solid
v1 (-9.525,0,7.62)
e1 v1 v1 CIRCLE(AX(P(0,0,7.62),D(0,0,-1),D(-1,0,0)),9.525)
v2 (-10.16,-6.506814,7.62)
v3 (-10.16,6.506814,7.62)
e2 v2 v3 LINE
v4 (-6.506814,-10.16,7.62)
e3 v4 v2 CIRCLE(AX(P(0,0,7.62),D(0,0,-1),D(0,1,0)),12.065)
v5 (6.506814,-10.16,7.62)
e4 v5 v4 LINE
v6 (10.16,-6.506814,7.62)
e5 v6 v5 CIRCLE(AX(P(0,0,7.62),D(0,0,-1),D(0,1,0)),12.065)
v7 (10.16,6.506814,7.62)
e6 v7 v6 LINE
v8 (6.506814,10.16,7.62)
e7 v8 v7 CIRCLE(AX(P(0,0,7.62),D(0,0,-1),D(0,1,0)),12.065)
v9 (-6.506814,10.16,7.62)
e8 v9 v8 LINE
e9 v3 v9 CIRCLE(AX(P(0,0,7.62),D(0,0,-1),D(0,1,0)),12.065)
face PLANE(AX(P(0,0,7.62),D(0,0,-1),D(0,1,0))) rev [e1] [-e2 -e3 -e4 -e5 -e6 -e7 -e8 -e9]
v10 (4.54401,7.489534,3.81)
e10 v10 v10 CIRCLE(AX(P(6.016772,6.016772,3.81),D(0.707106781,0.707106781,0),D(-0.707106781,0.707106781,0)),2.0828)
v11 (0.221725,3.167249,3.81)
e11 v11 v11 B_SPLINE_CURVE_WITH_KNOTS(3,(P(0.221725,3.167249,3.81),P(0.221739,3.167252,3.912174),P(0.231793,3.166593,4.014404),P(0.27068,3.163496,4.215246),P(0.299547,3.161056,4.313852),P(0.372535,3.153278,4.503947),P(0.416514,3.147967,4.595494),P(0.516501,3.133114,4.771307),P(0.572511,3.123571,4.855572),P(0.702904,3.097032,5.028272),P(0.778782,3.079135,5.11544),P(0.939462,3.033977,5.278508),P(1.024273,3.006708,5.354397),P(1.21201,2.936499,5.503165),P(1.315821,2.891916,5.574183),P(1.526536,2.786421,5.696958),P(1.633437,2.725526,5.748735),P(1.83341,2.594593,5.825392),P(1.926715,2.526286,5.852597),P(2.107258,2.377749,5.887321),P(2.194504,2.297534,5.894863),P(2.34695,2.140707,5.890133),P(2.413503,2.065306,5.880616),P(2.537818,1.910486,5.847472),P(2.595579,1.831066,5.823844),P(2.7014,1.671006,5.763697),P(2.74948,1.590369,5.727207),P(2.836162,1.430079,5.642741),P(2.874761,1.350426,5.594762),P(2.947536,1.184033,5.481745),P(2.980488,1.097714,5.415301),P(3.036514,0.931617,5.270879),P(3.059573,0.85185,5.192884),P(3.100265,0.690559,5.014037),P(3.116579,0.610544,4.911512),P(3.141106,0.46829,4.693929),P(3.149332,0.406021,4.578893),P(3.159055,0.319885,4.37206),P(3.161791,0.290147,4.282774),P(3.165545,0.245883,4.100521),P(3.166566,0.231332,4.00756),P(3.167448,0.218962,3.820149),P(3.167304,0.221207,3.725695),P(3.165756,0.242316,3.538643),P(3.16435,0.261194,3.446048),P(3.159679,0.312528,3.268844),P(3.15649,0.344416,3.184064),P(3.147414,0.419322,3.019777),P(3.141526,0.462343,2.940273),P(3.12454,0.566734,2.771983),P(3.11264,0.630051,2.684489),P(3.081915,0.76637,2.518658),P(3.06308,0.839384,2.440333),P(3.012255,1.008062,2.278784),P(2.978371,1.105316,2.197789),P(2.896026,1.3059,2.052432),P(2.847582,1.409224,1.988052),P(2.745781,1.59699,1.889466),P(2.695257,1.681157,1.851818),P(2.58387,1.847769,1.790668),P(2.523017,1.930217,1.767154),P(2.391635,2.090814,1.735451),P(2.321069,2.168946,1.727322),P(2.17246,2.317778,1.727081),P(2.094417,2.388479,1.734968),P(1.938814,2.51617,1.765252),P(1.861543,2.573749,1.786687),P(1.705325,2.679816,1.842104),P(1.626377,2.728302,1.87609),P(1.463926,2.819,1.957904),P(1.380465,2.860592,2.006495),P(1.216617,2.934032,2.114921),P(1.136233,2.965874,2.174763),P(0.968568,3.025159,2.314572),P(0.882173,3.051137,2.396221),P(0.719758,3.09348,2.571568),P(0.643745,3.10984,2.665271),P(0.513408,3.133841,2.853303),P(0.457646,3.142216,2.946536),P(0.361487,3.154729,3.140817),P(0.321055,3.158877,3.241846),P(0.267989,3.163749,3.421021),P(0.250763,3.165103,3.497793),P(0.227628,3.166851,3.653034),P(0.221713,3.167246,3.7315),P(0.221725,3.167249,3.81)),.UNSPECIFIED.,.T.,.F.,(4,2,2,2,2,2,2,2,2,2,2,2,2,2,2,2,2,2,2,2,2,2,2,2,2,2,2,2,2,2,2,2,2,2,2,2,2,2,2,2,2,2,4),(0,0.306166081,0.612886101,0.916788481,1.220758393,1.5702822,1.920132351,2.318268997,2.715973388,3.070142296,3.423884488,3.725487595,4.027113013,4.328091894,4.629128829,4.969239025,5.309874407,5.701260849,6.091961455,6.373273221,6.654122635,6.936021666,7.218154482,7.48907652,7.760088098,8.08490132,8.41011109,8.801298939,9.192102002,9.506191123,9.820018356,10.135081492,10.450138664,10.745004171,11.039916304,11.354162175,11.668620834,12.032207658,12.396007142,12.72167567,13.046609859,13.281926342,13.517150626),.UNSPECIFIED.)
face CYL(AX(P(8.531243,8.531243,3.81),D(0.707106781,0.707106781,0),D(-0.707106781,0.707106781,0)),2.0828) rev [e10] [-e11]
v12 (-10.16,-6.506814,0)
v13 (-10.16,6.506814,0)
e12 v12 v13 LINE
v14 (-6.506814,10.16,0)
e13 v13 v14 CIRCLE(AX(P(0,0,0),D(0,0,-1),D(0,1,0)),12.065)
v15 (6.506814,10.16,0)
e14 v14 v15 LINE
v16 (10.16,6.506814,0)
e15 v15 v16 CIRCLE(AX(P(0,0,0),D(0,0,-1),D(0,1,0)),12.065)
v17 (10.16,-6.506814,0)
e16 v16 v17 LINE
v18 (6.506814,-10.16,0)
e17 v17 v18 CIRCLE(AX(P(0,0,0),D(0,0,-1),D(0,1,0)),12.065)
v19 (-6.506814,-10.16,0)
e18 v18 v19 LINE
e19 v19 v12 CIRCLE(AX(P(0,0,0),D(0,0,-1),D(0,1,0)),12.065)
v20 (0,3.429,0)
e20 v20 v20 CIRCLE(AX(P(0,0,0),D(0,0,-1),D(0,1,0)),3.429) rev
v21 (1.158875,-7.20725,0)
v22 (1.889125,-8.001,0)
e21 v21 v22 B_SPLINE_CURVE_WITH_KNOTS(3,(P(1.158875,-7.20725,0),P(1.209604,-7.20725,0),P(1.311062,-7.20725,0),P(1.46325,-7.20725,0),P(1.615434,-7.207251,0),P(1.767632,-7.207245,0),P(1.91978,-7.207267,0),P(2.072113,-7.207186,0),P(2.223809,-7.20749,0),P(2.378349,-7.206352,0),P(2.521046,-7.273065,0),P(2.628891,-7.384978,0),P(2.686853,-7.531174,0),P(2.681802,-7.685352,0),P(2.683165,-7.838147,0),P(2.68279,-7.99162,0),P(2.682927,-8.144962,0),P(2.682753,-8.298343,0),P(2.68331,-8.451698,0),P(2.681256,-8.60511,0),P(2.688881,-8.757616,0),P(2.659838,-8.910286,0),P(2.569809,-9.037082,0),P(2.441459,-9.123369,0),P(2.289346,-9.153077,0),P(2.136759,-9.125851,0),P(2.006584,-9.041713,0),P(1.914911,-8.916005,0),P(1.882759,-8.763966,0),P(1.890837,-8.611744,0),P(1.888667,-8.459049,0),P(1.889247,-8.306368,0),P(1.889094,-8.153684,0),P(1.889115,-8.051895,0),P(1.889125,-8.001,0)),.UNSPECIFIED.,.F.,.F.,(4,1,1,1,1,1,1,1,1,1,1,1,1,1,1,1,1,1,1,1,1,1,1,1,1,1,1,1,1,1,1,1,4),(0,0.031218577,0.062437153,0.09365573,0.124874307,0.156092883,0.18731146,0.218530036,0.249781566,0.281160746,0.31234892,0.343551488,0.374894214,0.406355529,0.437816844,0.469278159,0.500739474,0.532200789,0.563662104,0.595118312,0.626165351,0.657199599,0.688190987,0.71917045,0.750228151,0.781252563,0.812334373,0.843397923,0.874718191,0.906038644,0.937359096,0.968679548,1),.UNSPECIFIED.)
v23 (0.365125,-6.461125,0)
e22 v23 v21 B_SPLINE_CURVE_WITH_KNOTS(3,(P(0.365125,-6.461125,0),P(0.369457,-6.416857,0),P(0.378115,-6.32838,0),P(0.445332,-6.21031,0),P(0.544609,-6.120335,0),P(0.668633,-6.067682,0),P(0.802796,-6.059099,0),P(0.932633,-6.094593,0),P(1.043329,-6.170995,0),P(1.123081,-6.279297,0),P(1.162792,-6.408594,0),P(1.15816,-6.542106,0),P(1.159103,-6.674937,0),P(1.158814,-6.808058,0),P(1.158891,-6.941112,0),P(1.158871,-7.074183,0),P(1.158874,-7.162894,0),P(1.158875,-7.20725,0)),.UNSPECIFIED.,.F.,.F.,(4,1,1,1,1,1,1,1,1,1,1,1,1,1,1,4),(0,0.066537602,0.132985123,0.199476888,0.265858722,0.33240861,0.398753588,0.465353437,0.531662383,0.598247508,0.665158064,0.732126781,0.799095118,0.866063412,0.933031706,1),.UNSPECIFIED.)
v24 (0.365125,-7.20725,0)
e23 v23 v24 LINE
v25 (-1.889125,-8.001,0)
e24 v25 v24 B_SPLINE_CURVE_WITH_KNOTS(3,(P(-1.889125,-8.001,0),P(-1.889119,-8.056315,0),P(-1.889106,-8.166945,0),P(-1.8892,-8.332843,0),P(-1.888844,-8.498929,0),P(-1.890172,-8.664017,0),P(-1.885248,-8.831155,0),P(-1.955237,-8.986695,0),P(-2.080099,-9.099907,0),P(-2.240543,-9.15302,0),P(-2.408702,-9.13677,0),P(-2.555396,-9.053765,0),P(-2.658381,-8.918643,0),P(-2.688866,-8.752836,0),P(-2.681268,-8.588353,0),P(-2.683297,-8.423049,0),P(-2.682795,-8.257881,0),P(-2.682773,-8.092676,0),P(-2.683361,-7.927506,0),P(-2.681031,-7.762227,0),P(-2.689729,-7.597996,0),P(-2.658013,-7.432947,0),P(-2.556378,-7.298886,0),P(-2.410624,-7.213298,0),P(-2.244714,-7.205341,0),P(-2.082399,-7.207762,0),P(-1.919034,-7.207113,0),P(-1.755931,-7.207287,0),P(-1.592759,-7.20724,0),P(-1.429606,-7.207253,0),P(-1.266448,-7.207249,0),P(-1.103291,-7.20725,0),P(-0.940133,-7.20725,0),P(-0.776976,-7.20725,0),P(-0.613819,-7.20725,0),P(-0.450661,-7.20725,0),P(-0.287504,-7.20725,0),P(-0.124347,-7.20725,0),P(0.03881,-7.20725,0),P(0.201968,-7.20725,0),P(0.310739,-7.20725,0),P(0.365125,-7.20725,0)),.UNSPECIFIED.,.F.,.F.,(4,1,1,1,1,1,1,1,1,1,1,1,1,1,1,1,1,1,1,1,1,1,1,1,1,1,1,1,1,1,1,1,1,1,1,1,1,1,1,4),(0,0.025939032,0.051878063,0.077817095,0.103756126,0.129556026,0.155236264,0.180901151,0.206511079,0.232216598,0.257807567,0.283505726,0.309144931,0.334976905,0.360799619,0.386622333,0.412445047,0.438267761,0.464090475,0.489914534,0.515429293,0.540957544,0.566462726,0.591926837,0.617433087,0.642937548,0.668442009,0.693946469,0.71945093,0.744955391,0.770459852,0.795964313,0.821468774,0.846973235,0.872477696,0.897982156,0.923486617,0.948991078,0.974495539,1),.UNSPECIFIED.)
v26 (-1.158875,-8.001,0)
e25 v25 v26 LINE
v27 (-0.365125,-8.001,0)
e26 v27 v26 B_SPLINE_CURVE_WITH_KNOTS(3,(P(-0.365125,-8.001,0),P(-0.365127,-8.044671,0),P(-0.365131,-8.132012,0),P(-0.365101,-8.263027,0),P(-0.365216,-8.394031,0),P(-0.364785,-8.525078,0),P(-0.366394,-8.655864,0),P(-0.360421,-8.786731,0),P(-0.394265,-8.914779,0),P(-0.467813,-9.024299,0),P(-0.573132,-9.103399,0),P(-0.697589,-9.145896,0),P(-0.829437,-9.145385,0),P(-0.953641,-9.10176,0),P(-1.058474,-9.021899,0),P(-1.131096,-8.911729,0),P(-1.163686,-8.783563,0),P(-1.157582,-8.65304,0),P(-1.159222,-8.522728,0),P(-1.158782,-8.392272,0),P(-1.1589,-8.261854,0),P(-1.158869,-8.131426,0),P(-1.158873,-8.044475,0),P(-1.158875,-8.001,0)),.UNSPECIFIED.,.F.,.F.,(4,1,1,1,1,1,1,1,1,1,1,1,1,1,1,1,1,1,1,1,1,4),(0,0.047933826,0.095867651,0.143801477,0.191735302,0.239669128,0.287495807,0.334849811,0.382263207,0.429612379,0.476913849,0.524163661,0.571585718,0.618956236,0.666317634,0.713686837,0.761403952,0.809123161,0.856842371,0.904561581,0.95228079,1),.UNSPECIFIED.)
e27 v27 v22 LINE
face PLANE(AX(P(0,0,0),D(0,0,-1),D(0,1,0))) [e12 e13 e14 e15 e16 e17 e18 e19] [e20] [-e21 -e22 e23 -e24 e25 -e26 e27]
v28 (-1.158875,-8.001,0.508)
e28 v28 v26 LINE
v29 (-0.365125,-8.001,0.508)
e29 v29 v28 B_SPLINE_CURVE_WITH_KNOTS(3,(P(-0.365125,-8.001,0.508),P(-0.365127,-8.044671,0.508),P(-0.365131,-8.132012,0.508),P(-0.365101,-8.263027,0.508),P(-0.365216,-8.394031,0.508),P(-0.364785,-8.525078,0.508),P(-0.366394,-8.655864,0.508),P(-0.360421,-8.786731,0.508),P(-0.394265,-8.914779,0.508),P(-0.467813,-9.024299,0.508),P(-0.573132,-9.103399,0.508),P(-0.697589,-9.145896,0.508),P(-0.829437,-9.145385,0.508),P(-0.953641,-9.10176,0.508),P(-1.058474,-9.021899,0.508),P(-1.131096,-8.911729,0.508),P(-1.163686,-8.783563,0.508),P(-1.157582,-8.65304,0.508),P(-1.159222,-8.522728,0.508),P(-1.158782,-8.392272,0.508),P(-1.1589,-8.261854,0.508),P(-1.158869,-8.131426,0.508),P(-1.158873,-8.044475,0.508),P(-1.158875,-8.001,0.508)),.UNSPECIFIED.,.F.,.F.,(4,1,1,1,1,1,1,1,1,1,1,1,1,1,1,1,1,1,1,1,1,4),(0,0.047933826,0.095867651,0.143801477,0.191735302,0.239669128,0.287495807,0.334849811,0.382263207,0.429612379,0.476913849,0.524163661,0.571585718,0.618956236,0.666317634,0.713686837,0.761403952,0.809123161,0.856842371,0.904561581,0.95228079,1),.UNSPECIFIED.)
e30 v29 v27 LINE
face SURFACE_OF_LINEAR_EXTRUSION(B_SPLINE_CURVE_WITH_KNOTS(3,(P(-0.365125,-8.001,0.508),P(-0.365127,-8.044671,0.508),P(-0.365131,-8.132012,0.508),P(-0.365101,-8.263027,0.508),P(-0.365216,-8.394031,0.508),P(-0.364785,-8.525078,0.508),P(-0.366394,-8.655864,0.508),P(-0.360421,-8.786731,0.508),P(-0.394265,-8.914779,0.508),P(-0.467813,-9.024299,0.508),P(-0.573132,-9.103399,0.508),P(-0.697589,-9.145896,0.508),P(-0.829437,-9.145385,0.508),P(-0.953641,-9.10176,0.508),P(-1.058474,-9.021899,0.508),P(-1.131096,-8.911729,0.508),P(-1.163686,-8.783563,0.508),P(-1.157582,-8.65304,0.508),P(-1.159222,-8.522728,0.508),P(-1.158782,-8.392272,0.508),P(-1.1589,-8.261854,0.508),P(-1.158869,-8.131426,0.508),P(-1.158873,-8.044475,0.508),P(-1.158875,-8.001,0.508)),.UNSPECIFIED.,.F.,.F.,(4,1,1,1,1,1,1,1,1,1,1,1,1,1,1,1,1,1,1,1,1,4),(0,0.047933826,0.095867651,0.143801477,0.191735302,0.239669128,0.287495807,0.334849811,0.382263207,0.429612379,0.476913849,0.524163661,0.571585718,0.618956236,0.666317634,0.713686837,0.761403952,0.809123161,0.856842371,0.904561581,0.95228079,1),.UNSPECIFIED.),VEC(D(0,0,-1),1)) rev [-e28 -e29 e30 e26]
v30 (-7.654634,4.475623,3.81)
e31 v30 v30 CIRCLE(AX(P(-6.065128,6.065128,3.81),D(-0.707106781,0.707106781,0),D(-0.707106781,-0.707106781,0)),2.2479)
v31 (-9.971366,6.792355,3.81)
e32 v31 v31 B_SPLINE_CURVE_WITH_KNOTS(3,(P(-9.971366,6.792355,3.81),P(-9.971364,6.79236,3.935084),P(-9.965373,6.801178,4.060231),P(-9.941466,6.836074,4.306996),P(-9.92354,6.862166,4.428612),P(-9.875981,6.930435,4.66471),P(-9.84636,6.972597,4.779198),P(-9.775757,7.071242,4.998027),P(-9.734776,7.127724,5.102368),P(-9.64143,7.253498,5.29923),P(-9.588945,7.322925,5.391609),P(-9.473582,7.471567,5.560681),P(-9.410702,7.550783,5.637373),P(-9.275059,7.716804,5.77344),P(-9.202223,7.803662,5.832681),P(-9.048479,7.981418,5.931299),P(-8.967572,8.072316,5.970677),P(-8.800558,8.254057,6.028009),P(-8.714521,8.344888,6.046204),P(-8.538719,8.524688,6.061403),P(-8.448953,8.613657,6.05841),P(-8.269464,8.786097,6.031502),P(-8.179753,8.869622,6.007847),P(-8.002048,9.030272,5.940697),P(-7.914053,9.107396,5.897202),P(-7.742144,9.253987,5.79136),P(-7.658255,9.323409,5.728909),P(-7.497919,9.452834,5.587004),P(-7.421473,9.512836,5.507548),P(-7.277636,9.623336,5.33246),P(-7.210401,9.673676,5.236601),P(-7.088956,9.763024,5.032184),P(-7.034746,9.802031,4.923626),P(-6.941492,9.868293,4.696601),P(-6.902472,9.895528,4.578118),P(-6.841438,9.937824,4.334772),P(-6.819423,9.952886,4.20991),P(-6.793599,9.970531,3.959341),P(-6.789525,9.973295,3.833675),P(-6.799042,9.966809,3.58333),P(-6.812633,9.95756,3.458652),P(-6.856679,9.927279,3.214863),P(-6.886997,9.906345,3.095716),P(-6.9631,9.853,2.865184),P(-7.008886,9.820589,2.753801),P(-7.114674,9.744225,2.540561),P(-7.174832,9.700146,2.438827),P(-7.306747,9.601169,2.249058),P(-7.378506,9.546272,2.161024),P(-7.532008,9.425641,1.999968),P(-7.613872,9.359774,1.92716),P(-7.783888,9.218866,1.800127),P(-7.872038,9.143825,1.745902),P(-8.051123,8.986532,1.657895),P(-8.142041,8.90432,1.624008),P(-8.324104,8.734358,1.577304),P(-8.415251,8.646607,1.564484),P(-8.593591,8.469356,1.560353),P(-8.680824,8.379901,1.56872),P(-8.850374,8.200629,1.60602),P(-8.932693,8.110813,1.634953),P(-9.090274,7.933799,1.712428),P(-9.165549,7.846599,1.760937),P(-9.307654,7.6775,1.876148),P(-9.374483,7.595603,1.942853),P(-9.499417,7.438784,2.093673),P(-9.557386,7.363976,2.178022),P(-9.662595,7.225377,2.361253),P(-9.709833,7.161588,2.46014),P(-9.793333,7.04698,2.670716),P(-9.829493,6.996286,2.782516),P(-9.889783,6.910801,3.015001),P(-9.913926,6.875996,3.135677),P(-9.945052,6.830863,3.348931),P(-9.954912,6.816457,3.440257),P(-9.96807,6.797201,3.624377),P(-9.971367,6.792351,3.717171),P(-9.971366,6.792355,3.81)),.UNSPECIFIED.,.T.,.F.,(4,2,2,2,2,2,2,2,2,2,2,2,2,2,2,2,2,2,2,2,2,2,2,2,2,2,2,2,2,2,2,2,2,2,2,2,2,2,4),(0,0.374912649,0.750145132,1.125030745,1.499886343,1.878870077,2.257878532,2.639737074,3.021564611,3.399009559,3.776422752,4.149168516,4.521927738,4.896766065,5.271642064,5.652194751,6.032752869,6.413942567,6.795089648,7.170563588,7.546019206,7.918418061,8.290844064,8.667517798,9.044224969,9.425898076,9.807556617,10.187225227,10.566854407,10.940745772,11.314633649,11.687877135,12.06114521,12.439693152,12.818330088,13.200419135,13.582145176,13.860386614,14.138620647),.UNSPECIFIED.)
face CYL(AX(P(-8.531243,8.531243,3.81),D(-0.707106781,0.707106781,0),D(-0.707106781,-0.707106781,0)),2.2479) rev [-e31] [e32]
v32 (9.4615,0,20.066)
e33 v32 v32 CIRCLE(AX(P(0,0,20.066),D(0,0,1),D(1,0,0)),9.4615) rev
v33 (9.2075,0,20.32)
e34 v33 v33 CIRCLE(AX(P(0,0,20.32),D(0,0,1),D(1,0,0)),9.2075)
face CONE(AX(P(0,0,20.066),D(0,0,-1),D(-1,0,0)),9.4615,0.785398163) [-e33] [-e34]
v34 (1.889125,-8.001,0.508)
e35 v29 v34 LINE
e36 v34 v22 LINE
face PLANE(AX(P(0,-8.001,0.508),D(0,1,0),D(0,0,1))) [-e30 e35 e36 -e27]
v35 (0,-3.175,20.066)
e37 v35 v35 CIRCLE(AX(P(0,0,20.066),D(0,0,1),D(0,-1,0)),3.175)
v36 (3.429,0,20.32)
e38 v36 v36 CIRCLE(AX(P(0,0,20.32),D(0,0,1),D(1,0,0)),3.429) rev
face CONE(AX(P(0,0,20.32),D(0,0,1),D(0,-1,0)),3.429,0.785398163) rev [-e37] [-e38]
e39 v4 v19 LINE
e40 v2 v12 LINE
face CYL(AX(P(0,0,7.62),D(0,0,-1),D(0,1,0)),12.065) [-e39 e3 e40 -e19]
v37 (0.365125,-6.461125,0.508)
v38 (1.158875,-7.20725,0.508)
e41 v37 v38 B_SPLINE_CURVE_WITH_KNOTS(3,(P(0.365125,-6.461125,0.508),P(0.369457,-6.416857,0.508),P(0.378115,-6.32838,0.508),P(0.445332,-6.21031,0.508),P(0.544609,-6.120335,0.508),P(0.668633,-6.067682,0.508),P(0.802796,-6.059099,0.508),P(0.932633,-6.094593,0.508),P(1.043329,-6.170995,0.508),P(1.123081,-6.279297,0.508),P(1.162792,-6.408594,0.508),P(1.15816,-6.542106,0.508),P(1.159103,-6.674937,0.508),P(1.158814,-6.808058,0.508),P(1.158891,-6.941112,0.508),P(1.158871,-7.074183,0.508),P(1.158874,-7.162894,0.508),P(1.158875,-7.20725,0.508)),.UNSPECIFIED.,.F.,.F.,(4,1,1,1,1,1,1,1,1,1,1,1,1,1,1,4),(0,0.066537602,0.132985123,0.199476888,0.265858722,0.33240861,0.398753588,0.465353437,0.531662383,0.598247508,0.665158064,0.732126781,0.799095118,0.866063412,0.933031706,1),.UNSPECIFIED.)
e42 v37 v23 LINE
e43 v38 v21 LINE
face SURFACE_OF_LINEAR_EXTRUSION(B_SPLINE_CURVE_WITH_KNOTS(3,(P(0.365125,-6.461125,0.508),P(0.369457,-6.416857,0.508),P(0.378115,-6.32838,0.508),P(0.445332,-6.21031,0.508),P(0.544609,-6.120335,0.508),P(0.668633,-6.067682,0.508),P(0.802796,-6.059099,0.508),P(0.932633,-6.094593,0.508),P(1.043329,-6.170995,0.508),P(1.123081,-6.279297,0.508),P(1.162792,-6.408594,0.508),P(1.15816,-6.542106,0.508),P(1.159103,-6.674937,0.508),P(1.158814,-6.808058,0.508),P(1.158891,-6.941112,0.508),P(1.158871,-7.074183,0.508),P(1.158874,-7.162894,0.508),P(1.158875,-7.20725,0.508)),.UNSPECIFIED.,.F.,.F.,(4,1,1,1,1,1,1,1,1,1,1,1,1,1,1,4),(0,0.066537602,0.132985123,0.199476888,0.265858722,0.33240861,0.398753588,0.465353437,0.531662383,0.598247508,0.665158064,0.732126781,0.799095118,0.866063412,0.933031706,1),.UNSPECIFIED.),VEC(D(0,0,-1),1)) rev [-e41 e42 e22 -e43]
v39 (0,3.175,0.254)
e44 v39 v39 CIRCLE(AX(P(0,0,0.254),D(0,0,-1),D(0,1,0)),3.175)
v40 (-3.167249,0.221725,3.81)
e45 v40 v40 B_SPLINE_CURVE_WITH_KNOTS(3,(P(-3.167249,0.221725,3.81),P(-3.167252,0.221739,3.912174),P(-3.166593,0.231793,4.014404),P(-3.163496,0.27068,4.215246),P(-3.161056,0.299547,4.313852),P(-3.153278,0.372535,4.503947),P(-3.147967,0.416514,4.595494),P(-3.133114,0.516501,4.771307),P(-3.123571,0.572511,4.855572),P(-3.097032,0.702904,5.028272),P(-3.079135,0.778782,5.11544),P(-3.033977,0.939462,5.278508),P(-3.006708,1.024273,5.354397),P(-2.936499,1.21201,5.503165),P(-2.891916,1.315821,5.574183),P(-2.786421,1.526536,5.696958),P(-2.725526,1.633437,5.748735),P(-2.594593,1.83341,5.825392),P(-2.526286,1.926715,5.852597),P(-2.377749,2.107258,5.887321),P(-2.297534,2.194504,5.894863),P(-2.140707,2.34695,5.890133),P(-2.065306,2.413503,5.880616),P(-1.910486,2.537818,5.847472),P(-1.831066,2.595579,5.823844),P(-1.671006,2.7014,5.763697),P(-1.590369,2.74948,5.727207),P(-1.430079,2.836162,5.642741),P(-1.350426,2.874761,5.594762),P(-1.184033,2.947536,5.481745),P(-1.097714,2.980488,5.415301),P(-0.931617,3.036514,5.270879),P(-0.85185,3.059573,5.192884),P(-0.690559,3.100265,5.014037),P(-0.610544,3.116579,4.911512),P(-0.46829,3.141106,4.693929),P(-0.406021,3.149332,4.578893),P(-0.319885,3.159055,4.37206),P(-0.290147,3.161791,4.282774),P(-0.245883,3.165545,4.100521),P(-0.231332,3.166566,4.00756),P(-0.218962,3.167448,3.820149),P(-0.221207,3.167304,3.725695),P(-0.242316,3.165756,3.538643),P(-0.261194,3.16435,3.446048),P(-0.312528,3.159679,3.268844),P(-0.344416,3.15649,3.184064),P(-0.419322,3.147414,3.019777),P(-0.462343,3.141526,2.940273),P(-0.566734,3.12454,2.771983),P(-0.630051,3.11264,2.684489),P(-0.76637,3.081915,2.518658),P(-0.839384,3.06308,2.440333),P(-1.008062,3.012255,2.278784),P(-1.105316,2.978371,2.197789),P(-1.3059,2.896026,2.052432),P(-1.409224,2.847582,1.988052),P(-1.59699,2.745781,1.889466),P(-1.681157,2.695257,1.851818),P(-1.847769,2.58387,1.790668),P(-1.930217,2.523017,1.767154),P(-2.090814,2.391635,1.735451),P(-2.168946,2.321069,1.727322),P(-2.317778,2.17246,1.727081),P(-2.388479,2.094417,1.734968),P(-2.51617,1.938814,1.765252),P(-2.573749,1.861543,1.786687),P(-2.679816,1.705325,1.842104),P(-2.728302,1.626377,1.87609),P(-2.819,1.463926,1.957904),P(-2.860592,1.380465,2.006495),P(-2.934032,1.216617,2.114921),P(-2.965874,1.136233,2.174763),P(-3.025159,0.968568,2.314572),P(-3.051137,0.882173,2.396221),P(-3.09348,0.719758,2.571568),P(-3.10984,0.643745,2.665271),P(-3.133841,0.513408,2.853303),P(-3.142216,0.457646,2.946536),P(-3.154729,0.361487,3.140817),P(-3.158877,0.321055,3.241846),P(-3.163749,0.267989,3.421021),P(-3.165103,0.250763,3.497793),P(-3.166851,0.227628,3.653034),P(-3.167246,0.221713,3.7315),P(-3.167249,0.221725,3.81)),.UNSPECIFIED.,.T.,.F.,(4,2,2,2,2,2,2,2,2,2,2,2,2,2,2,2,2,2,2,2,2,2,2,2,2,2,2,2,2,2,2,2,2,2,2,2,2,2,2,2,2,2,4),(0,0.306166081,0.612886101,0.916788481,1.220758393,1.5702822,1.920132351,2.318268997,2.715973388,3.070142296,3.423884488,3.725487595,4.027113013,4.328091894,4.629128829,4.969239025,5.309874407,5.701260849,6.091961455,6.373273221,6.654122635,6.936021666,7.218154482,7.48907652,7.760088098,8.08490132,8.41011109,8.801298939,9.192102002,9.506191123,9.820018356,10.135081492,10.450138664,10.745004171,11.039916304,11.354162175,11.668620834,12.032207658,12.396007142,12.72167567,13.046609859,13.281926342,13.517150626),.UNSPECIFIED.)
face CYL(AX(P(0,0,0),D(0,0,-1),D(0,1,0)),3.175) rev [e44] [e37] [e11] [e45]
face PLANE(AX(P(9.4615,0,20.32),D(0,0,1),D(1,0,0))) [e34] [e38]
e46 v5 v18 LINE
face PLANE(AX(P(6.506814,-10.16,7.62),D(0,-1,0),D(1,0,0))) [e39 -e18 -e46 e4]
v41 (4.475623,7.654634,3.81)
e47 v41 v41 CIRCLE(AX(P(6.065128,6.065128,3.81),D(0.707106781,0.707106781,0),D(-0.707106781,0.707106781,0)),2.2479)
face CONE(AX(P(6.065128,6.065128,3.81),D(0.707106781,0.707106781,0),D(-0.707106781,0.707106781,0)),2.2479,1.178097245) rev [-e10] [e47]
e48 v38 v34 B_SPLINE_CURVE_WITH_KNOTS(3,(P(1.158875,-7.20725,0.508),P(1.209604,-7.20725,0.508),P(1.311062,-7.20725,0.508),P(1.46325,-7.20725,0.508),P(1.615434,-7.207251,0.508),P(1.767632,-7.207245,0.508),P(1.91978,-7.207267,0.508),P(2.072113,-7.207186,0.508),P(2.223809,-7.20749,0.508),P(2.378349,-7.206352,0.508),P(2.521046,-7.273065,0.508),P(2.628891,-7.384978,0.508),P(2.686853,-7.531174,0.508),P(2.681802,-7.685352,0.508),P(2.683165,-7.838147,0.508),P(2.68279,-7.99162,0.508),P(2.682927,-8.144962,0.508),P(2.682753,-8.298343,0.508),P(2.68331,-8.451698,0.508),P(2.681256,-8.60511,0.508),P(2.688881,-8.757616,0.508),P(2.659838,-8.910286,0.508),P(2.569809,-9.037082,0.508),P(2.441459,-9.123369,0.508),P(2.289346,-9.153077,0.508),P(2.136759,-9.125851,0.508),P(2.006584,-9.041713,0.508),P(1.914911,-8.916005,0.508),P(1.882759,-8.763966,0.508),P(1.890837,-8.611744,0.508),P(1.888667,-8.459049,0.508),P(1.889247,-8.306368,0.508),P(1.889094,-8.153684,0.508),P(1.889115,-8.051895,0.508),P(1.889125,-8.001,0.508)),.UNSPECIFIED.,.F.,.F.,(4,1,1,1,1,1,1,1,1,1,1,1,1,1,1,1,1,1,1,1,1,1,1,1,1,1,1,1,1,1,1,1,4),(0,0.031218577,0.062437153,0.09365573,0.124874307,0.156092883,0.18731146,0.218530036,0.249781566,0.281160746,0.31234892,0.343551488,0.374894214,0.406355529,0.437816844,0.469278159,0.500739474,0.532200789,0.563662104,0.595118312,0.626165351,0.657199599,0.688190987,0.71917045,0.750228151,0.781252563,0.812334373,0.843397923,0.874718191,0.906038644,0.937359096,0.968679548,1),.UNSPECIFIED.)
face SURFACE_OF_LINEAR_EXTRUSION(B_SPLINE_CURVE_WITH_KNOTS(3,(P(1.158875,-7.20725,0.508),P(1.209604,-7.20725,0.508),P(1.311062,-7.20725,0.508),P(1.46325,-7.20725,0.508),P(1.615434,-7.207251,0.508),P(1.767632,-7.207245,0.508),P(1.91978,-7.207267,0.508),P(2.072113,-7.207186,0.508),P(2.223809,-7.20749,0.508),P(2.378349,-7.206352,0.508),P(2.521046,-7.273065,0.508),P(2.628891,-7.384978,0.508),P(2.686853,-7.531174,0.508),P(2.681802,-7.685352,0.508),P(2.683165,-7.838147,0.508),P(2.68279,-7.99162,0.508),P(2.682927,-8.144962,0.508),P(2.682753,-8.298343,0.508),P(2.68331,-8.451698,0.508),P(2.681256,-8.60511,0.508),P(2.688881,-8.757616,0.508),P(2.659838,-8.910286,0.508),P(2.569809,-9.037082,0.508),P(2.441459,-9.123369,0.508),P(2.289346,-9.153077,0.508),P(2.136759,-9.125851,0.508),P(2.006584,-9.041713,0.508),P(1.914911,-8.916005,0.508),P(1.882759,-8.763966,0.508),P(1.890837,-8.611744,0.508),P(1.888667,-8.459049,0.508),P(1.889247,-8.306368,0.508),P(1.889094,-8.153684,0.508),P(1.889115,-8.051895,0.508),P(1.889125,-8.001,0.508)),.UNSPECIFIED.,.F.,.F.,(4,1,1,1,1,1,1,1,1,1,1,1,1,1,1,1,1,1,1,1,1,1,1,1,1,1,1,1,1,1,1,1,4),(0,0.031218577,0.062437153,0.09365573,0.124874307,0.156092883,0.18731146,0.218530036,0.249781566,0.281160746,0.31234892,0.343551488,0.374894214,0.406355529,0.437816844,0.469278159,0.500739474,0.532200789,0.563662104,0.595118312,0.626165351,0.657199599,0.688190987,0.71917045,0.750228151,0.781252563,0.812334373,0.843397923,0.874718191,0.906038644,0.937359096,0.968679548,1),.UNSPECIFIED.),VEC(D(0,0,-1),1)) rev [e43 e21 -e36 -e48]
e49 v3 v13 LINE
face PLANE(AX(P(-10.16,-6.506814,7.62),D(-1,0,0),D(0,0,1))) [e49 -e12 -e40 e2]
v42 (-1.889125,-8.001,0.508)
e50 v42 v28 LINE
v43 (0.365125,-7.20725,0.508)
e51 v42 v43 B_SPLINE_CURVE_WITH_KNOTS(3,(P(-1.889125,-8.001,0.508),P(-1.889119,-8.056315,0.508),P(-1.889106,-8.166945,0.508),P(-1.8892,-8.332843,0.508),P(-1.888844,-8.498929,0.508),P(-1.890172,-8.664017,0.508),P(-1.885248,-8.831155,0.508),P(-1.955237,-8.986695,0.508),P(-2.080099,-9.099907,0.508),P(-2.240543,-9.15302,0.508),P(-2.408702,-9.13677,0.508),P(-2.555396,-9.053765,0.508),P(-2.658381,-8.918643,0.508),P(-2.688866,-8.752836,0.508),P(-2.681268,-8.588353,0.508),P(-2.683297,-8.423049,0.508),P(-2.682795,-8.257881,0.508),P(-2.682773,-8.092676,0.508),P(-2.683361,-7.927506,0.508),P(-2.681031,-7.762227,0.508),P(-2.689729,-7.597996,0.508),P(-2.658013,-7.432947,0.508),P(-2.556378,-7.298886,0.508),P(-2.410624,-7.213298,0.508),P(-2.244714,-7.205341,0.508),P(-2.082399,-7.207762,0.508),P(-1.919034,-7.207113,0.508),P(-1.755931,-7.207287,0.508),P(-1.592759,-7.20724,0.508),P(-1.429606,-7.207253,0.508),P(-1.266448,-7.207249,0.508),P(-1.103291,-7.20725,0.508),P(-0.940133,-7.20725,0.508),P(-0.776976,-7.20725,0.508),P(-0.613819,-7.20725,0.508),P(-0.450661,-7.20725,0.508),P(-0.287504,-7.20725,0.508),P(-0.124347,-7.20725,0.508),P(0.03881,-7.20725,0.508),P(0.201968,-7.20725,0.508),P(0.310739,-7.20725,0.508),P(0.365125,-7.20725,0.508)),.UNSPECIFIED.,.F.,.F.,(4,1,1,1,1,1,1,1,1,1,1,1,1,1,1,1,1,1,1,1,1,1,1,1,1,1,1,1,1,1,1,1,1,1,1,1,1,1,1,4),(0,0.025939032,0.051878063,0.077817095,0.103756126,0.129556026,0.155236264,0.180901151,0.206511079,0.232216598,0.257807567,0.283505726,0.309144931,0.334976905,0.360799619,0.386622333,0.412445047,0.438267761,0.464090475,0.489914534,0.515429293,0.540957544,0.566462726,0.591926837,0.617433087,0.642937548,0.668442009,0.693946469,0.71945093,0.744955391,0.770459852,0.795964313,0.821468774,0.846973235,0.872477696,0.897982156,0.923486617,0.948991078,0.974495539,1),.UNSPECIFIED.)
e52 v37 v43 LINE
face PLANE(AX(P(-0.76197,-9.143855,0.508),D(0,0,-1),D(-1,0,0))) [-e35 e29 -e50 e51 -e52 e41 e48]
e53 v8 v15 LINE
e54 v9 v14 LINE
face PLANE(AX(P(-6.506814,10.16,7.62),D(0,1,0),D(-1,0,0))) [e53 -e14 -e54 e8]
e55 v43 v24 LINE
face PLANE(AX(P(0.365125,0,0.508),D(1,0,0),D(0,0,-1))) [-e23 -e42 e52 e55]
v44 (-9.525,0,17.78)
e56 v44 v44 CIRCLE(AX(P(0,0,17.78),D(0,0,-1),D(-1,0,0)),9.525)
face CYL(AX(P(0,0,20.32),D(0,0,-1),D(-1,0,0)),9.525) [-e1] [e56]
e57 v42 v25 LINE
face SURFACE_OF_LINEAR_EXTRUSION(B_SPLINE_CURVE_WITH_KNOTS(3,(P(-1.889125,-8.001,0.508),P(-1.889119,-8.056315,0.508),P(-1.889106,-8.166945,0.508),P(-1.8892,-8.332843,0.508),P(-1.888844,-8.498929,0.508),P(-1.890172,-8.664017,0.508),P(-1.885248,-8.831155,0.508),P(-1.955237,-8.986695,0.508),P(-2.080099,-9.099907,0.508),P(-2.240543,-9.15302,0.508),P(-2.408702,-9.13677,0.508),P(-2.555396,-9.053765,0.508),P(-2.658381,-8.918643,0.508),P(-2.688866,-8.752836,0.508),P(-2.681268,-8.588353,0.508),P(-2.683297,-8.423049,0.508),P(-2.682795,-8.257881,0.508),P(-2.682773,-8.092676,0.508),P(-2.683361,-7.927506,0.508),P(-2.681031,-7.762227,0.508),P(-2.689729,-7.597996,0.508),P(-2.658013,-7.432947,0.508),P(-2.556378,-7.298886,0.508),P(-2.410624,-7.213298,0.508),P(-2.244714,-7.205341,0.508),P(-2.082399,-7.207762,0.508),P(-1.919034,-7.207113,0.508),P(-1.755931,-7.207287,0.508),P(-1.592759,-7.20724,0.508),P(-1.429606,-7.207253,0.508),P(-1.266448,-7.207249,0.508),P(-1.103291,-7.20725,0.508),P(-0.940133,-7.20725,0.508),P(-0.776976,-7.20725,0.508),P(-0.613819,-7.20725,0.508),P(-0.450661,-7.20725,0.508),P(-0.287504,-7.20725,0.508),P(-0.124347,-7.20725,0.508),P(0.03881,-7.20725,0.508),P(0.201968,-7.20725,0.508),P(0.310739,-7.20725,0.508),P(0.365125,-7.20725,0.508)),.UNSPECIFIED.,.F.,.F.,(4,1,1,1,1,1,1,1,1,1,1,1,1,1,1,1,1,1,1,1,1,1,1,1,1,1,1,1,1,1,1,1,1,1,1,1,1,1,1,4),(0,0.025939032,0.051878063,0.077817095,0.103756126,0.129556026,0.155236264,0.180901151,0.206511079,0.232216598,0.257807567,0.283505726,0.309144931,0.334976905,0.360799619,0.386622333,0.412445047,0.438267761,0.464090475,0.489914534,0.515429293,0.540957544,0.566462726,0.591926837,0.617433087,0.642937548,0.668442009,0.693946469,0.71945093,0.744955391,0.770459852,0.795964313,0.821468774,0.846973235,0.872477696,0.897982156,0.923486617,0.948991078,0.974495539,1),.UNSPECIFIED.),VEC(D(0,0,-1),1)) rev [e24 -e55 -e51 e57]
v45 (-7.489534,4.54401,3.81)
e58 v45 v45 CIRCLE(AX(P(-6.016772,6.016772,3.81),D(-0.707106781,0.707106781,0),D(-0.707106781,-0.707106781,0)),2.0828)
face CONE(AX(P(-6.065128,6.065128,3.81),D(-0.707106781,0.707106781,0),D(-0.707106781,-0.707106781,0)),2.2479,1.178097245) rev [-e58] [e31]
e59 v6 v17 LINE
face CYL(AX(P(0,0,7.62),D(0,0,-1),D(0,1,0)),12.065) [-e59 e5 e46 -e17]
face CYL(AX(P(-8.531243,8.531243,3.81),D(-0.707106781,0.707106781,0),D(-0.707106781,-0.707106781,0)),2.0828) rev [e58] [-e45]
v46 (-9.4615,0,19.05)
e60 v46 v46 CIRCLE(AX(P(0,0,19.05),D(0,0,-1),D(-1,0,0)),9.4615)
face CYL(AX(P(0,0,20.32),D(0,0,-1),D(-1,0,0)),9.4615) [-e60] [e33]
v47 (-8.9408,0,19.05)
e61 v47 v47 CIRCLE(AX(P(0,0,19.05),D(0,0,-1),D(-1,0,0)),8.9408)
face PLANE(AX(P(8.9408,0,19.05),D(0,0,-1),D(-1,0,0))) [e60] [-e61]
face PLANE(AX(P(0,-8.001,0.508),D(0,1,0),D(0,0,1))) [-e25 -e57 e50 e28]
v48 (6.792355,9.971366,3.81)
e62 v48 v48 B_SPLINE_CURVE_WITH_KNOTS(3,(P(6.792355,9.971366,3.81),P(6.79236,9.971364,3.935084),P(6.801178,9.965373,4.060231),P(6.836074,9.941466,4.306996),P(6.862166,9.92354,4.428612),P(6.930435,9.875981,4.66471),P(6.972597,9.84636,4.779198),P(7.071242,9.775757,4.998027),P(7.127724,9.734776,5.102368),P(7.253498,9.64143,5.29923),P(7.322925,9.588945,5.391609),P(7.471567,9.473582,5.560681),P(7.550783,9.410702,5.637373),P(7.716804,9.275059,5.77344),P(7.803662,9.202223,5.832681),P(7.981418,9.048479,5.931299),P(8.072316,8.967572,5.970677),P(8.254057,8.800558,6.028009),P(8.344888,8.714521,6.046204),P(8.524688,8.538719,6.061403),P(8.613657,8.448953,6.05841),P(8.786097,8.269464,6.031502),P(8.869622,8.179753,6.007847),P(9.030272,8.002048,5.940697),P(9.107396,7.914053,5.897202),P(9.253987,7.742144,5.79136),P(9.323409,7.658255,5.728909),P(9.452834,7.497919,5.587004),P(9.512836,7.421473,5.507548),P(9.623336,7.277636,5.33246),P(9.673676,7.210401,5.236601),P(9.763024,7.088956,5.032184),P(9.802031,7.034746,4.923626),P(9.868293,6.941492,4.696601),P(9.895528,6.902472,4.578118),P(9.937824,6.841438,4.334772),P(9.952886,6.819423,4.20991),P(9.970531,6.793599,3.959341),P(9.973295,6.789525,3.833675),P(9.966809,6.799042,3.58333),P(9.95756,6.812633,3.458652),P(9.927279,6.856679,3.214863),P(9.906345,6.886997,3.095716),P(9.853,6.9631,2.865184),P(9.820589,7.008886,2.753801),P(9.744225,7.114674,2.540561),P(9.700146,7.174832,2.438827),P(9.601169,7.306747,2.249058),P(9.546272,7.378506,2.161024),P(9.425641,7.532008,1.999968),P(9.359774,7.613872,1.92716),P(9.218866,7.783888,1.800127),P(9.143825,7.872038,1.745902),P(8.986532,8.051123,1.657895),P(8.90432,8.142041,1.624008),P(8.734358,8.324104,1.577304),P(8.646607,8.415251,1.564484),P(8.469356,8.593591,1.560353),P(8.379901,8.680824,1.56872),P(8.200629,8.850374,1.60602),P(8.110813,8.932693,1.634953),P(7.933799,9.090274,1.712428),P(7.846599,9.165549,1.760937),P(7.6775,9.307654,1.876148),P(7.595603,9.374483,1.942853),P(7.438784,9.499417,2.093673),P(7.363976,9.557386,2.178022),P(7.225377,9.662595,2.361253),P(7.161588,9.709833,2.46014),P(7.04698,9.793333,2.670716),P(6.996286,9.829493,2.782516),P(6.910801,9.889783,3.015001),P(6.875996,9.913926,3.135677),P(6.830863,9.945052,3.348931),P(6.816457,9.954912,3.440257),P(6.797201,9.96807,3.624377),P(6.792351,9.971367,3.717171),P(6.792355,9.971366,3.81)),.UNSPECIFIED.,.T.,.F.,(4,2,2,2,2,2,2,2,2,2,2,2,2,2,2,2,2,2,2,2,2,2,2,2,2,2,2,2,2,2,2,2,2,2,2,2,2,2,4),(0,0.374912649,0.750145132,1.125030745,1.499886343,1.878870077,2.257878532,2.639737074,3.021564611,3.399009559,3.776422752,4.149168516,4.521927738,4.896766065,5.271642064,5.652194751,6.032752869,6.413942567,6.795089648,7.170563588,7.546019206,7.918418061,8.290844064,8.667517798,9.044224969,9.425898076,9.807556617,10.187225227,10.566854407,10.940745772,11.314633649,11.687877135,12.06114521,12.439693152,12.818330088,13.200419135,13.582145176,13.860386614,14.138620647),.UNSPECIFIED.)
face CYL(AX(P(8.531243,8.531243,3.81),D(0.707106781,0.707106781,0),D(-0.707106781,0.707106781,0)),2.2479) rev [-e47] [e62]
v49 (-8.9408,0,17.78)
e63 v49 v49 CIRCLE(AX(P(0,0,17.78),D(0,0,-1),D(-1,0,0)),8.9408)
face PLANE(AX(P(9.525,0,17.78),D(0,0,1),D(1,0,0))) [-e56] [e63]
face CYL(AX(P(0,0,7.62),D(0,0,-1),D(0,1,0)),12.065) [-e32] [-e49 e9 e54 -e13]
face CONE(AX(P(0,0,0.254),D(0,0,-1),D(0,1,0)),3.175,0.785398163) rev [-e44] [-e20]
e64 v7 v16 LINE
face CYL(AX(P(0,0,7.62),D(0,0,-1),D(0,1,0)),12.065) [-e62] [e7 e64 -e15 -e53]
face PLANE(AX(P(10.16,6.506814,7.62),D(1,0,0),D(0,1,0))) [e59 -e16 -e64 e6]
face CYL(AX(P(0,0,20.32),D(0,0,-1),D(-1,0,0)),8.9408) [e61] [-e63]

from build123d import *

# Parameters (mm, degrees)
BOSS_EXTRUDE1_DEPTH         = 7.62
CUT_EXTRUDE1_START          = 1.523953
CUT_EXTRUDE1_DEPTH          = 0.508
F_1_4_0_25_DIAMETER_HOLE1_D = 6.35
CHAMFER1_SIZE               = 0.254


# Read off the part's stored shape, not the designer's step: CSK for #6 Flat Head Machine Screw (100)1, CSK for #6 Flat Head Machine Screw (100)2
with BuildPart() as part:
    # Sketch1 → Boss-Extrude1 (new body)
    with BuildSketch(Plane(origin=(0, 0, 0), x_dir=(-1, 0, 0), z_dir=(0, 0, -1))):
        with BuildLine():
            Line((10.16, -6.506813736), (10.16, 6.506813736))
            ThreePointArc((10.16, 6.506813736), (8.531243315, 8.531243315), (6.506813736, 10.16))
            Line((6.506813736, 10.16), (-6.506813736, 10.16))
            ThreePointArc((-6.506813736, 10.16), (-8.531243315, 8.531243315), (-10.16, 6.506813736))
            Line((-10.16, 6.506813736), (-10.16, -6.506813736))
            ThreePointArc((-10.16, -6.506813736), (-8.531243315, -8.531243315), (-6.506813736, -10.16))
            Line((-6.506813736, -10.16), (6.506813736, -10.16))
            ThreePointArc((6.506813736, -10.16), (8.531243315, -8.531243315), (10.16, -6.506813736))
        make_face()
    extrude(amount=-BOSS_EXTRUDE1_DEPTH)

    # Sketch2 → Cut-Extrude1 (cut)
    with BuildSketch(Plane(origin=(0, 0, 1.523952559), x_dir=(-1, 0, 0), z_dir=(0, 0, -1)).offset(CUT_EXTRUDE1_START)):
        with BuildLine():
            Line((1.889125, -8.001), (1.158875, -8.001))
            add(Edge.make_bspline(
                [(1.158875, -8.001), (1.158872937, -8.044475215), (1.158868812, -8.131425646), (1.158899751, -8.261853836), (1.158782182, -8.392271851), (1.159221519, -8.522728024), (1.157581766, -8.65303983), (1.163686315, -8.783563395), (1.131096282, -8.911728677), (1.058473502, -9.021898611), (0.953640515, -9.101760404), (0.829437405, -9.145385371), (0.697588706, -9.145896155), (0.573131645, -9.103398602), (0.467813448, -9.024298708), (0.394265073, -8.914779016), (0.360421234, -8.786730663), (0.366393811, -8.655863654), (0.36478471, -8.525077993), (0.365216149, -8.394030645), (0.365100694, -8.26302727), (0.365131077, -8.132012169), (0.365127026, -8.044670723), (0.365125, -8.001)],
                knots=[0, 0, 0, 0, 0.04771921, 0.095438419, 0.143157629, 0.190876839, 0.238596048, 0.286313163, 0.333682366, 0.381043764, 0.428414282, 0.475836339, 0.523086151, 0.570387621, 0.617736793, 0.665150189, 0.712504193, 0.760330872, 0.808264698, 0.856198523, 0.904132349, 0.952066174, 1, 1, 1, 1], degree=3))
            Line((0.365125, -8.001), (-1.889125, -8.001))
            add(Edge.make_bspline(
                [(-1.889125, -8.001), (-1.889114812, -8.051894525), (-1.889094436, -8.153683576), (-1.889247255, -8.306368158), (-1.888666545, -8.459048717), (-1.890836563, -8.611744064), (-1.882759373, -8.763965749), (-1.914911349, -8.916005254), (-2.006583536, -9.041712954), (-2.136758982, -9.125851008), (-2.289345509, -9.153077401), (-2.441459117, -9.123368959), (-2.569808734, -9.037082272), (-2.65983821, -8.910286231), (-2.688880942, -8.757615863), (-2.681256155, -8.60511048), (-2.683310175, -8.451698443), (-2.682753256, -8.298343213), (-2.682926802, -8.144961863), (-2.682789537, -7.991619884), (-2.683165051, -7.838146541), (-2.681801975, -7.685351504), (-2.686853196, -7.53117355), (-2.628890851, -7.38497772), (-2.521046133, -7.273065177), (-2.378348767, -7.206351642), (-2.223808502, -7.207490017), (-2.072112792, -7.207185716), (-1.919779713, -7.207267225), (-1.767631713, -7.207245385), (-1.615434122, -7.207251236), (-1.463249814, -7.20724967), (-1.311061964, -7.207250082), (-1.209603988, -7.207250027), (-1.158875, -7.20725)],
                knots=[0, 0, 0, 0, 0.031320452, 0.062640904, 0.093961356, 0.125281809, 0.156602077, 0.187665627, 0.218747437, 0.249771849, 0.28082955, 0.311809013, 0.342800401, 0.373834649, 0.404881688, 0.436337896, 0.467799211, 0.499260526, 0.530721841, 0.562183156, 0.593644471, 0.625105786, 0.656448512, 0.68765108, 0.718839254, 0.750218434, 0.781469964, 0.81268854, 0.843907117, 0.875125693, 0.90634427, 0.937562847, 0.968781423, 1, 1, 1, 1], degree=3))
            add(Edge.make_bspline(
                [(-1.158875, -7.20725), (-1.158873643, -7.162894388), (-1.158870928, -7.074183165), (-1.158891289, -6.941111847), (-1.158813917, -6.808058432), (-1.159103046, -6.674937496), (-1.158160413, -6.542105789), (-1.162792352, -6.40859388), (-1.123081204, -6.279296809), (-1.043328982, -6.17099473), (-0.932633409, -6.094593309), (-0.802795792, -6.059099197), (-0.668632801, -6.067681678), (-0.544609192, -6.120335348), (-0.445331921, -6.210309856), (-0.378114798, -6.328380261), (-0.369456887, -6.416856776), (-0.365125, -6.461125)],
                knots=[0, 0, 0, 0, 0.066968294, 0.133936588, 0.200904882, 0.267873219, 0.334841936, 0.401752492, 0.468337617, 0.534646563, 0.601246412, 0.66759139, 0.734141278, 0.800523112, 0.867014877, 0.933462398, 1, 1, 1, 1], degree=3))
            Line((-0.365125, -6.461125), (-0.365125, -7.20725))
            add(Edge.make_bspline(
                [(-0.365125, -7.20725), (-0.31073924, -7.20725), (-0.20196772, -7.20725), (-0.03881044, -7.20725), (0.124346841, -7.20725), (0.287504121, -7.20725), (0.450661401, -7.207250001), (0.61381868, -7.207249996), (0.776975966, -7.207250014), (0.940133226, -7.207249949), (1.103290581, -7.207250189), (1.26644758, -7.207249293), (1.42960591, -7.207252638), (1.59275927, -7.207240153), (1.755931181, -7.207286749), (1.91903386, -7.207112852), (2.082398735, -7.207761857), (2.244713636, -7.205340907), (2.410623595, -7.213297949), (2.556377817, -7.298886101), (2.658013084, -7.432947287), (2.689729238, -7.59799594), (2.681031241, -7.762226985), (2.683361321, -7.927506447), (2.682773435, -8.092675694), (2.682794937, -8.257881374), (2.683296815, -8.423048668), (2.68126756, -8.588352833), (2.688866329, -8.75283629), (2.658381139, -8.918643331), (2.555396264, -9.053764707), (2.408701771, -9.136770112), (2.2405432, -9.153020414), (2.080098519, -9.09990658), (1.955237034, -8.986695), (1.885247755, -8.831155243), (1.890172169, -8.664016711), (1.888843871, -8.498928973), (1.889199968, -8.332843432), (1.889106258, -8.166945119), (1.889118753, -8.05631504), (1.889125, -8.001)],
                knots=[0, 0, 0, 0, 0.025504461, 0.051008922, 0.076513383, 0.102017844, 0.127522304, 0.153026765, 0.178531226, 0.204035687, 0.229540148, 0.255044609, 0.28054907, 0.306053531, 0.331557991, 0.357062452, 0.382566913, 0.408073163, 0.433537274, 0.459042456, 0.484570707, 0.510085466, 0.535909525, 0.561732239, 0.587554953, 0.613377667, 0.639200381, 0.665023095, 0.690855069, 0.716494274, 0.742192433, 0.767783402, 0.793488921, 0.819098849, 0.844763736, 0.870443974, 0.896243874, 0.922182905, 0.948121937, 0.974060968, 1, 1, 1, 1], degree=3))
        make_face()
    extrude(amount=-CUT_EXTRUDE1_DEPTH, mode=Mode.SUBTRACT)

    # Sketch3 → Revolve1 (revolve)
    with BuildSketch(Plane.XZ, mode=Mode.PRIVATE) as revolve1_sk:
        Polygon((9.4615, 20.32), (0, 20.32), (0, 7.62), (9.525, 7.62), (9.525, 17.78), (8.9408, 17.78), (8.9408, 19.05), (9.4615, 19.05), align=None)
    revolve(revolve1_sk.sketch.rotate(Axis((0, 0, 20.32), (0, 0, -1)), 180), axis=Axis((0, 0, 20.32), (0, 0, -1)))

    # 1/4 (0.25) Diameter Hole1 (through all)
    with Locations(Plane(origin=(0, 0, 0), x_dir=(-1, 0, 0), z_dir=(0, 0, -1))):
        with Locations((0, 0)):
            Hole(F_1_4_0_25_DIAMETER_HOLE1_D / 2)

    # CSK for _6 Flat Head Machine Screw _ 2 → CSK for _6 Flat Head Machine Screw _100 (revolve, cut)
    with BuildSketch(Plane(origin=(0, 0, 3.81), x_dir=(0.7071067811866009, 0.7071067811864942, 0), z_dir=(0, 0, -1))):
        Polygon((2.0828, -8.509), (2.0828, -2.395972613), (0, -2.395972613), (0, -12.065031051), (2.2479, -12.065031051), (2.2479, -8.577386659), align=None)
    revolve(axis=Axis((0, 0, 3.81), (0.7071067811864942, -0.7071067811866009, 0)), mode=Mode.SUBTRACT)

    # CSK for _6 Flat Head Machine Screw _ 3 o → CSK for _6 Flat Head Machine Screw _ 3 (revolve, cut)
    with BuildSketch(Plane(origin=(0, 0, 3.81), x_dir=(0.707106781186431, -0.707106781186664, 0), z_dir=(0, 0, 1))):
        Polygon((0, 2.395972613), (2.0828, 2.395972613), (2.0828, 8.509), (2.2479, 8.577386659), (2.2479, 12.065031051), (0, 12.065031051), align=None)
    revolve(axis=Axis((0, 0, 3.81), (0.707106781186664, 0.707106781186431, 0)), mode=Mode.SUBTRACT)

    # Chamfer1
    chamfer1_edges = [part.edges().sort_by_distance(p)[0] for p in [
        (9.4615, 0, 20.32),
        (-3.175, 0, 0),
        (-3.175, 0, 20.32),
    ]]
    chamfer(chamfer1_edges, length=CHAMFER1_SIZE)


solid = part.part
